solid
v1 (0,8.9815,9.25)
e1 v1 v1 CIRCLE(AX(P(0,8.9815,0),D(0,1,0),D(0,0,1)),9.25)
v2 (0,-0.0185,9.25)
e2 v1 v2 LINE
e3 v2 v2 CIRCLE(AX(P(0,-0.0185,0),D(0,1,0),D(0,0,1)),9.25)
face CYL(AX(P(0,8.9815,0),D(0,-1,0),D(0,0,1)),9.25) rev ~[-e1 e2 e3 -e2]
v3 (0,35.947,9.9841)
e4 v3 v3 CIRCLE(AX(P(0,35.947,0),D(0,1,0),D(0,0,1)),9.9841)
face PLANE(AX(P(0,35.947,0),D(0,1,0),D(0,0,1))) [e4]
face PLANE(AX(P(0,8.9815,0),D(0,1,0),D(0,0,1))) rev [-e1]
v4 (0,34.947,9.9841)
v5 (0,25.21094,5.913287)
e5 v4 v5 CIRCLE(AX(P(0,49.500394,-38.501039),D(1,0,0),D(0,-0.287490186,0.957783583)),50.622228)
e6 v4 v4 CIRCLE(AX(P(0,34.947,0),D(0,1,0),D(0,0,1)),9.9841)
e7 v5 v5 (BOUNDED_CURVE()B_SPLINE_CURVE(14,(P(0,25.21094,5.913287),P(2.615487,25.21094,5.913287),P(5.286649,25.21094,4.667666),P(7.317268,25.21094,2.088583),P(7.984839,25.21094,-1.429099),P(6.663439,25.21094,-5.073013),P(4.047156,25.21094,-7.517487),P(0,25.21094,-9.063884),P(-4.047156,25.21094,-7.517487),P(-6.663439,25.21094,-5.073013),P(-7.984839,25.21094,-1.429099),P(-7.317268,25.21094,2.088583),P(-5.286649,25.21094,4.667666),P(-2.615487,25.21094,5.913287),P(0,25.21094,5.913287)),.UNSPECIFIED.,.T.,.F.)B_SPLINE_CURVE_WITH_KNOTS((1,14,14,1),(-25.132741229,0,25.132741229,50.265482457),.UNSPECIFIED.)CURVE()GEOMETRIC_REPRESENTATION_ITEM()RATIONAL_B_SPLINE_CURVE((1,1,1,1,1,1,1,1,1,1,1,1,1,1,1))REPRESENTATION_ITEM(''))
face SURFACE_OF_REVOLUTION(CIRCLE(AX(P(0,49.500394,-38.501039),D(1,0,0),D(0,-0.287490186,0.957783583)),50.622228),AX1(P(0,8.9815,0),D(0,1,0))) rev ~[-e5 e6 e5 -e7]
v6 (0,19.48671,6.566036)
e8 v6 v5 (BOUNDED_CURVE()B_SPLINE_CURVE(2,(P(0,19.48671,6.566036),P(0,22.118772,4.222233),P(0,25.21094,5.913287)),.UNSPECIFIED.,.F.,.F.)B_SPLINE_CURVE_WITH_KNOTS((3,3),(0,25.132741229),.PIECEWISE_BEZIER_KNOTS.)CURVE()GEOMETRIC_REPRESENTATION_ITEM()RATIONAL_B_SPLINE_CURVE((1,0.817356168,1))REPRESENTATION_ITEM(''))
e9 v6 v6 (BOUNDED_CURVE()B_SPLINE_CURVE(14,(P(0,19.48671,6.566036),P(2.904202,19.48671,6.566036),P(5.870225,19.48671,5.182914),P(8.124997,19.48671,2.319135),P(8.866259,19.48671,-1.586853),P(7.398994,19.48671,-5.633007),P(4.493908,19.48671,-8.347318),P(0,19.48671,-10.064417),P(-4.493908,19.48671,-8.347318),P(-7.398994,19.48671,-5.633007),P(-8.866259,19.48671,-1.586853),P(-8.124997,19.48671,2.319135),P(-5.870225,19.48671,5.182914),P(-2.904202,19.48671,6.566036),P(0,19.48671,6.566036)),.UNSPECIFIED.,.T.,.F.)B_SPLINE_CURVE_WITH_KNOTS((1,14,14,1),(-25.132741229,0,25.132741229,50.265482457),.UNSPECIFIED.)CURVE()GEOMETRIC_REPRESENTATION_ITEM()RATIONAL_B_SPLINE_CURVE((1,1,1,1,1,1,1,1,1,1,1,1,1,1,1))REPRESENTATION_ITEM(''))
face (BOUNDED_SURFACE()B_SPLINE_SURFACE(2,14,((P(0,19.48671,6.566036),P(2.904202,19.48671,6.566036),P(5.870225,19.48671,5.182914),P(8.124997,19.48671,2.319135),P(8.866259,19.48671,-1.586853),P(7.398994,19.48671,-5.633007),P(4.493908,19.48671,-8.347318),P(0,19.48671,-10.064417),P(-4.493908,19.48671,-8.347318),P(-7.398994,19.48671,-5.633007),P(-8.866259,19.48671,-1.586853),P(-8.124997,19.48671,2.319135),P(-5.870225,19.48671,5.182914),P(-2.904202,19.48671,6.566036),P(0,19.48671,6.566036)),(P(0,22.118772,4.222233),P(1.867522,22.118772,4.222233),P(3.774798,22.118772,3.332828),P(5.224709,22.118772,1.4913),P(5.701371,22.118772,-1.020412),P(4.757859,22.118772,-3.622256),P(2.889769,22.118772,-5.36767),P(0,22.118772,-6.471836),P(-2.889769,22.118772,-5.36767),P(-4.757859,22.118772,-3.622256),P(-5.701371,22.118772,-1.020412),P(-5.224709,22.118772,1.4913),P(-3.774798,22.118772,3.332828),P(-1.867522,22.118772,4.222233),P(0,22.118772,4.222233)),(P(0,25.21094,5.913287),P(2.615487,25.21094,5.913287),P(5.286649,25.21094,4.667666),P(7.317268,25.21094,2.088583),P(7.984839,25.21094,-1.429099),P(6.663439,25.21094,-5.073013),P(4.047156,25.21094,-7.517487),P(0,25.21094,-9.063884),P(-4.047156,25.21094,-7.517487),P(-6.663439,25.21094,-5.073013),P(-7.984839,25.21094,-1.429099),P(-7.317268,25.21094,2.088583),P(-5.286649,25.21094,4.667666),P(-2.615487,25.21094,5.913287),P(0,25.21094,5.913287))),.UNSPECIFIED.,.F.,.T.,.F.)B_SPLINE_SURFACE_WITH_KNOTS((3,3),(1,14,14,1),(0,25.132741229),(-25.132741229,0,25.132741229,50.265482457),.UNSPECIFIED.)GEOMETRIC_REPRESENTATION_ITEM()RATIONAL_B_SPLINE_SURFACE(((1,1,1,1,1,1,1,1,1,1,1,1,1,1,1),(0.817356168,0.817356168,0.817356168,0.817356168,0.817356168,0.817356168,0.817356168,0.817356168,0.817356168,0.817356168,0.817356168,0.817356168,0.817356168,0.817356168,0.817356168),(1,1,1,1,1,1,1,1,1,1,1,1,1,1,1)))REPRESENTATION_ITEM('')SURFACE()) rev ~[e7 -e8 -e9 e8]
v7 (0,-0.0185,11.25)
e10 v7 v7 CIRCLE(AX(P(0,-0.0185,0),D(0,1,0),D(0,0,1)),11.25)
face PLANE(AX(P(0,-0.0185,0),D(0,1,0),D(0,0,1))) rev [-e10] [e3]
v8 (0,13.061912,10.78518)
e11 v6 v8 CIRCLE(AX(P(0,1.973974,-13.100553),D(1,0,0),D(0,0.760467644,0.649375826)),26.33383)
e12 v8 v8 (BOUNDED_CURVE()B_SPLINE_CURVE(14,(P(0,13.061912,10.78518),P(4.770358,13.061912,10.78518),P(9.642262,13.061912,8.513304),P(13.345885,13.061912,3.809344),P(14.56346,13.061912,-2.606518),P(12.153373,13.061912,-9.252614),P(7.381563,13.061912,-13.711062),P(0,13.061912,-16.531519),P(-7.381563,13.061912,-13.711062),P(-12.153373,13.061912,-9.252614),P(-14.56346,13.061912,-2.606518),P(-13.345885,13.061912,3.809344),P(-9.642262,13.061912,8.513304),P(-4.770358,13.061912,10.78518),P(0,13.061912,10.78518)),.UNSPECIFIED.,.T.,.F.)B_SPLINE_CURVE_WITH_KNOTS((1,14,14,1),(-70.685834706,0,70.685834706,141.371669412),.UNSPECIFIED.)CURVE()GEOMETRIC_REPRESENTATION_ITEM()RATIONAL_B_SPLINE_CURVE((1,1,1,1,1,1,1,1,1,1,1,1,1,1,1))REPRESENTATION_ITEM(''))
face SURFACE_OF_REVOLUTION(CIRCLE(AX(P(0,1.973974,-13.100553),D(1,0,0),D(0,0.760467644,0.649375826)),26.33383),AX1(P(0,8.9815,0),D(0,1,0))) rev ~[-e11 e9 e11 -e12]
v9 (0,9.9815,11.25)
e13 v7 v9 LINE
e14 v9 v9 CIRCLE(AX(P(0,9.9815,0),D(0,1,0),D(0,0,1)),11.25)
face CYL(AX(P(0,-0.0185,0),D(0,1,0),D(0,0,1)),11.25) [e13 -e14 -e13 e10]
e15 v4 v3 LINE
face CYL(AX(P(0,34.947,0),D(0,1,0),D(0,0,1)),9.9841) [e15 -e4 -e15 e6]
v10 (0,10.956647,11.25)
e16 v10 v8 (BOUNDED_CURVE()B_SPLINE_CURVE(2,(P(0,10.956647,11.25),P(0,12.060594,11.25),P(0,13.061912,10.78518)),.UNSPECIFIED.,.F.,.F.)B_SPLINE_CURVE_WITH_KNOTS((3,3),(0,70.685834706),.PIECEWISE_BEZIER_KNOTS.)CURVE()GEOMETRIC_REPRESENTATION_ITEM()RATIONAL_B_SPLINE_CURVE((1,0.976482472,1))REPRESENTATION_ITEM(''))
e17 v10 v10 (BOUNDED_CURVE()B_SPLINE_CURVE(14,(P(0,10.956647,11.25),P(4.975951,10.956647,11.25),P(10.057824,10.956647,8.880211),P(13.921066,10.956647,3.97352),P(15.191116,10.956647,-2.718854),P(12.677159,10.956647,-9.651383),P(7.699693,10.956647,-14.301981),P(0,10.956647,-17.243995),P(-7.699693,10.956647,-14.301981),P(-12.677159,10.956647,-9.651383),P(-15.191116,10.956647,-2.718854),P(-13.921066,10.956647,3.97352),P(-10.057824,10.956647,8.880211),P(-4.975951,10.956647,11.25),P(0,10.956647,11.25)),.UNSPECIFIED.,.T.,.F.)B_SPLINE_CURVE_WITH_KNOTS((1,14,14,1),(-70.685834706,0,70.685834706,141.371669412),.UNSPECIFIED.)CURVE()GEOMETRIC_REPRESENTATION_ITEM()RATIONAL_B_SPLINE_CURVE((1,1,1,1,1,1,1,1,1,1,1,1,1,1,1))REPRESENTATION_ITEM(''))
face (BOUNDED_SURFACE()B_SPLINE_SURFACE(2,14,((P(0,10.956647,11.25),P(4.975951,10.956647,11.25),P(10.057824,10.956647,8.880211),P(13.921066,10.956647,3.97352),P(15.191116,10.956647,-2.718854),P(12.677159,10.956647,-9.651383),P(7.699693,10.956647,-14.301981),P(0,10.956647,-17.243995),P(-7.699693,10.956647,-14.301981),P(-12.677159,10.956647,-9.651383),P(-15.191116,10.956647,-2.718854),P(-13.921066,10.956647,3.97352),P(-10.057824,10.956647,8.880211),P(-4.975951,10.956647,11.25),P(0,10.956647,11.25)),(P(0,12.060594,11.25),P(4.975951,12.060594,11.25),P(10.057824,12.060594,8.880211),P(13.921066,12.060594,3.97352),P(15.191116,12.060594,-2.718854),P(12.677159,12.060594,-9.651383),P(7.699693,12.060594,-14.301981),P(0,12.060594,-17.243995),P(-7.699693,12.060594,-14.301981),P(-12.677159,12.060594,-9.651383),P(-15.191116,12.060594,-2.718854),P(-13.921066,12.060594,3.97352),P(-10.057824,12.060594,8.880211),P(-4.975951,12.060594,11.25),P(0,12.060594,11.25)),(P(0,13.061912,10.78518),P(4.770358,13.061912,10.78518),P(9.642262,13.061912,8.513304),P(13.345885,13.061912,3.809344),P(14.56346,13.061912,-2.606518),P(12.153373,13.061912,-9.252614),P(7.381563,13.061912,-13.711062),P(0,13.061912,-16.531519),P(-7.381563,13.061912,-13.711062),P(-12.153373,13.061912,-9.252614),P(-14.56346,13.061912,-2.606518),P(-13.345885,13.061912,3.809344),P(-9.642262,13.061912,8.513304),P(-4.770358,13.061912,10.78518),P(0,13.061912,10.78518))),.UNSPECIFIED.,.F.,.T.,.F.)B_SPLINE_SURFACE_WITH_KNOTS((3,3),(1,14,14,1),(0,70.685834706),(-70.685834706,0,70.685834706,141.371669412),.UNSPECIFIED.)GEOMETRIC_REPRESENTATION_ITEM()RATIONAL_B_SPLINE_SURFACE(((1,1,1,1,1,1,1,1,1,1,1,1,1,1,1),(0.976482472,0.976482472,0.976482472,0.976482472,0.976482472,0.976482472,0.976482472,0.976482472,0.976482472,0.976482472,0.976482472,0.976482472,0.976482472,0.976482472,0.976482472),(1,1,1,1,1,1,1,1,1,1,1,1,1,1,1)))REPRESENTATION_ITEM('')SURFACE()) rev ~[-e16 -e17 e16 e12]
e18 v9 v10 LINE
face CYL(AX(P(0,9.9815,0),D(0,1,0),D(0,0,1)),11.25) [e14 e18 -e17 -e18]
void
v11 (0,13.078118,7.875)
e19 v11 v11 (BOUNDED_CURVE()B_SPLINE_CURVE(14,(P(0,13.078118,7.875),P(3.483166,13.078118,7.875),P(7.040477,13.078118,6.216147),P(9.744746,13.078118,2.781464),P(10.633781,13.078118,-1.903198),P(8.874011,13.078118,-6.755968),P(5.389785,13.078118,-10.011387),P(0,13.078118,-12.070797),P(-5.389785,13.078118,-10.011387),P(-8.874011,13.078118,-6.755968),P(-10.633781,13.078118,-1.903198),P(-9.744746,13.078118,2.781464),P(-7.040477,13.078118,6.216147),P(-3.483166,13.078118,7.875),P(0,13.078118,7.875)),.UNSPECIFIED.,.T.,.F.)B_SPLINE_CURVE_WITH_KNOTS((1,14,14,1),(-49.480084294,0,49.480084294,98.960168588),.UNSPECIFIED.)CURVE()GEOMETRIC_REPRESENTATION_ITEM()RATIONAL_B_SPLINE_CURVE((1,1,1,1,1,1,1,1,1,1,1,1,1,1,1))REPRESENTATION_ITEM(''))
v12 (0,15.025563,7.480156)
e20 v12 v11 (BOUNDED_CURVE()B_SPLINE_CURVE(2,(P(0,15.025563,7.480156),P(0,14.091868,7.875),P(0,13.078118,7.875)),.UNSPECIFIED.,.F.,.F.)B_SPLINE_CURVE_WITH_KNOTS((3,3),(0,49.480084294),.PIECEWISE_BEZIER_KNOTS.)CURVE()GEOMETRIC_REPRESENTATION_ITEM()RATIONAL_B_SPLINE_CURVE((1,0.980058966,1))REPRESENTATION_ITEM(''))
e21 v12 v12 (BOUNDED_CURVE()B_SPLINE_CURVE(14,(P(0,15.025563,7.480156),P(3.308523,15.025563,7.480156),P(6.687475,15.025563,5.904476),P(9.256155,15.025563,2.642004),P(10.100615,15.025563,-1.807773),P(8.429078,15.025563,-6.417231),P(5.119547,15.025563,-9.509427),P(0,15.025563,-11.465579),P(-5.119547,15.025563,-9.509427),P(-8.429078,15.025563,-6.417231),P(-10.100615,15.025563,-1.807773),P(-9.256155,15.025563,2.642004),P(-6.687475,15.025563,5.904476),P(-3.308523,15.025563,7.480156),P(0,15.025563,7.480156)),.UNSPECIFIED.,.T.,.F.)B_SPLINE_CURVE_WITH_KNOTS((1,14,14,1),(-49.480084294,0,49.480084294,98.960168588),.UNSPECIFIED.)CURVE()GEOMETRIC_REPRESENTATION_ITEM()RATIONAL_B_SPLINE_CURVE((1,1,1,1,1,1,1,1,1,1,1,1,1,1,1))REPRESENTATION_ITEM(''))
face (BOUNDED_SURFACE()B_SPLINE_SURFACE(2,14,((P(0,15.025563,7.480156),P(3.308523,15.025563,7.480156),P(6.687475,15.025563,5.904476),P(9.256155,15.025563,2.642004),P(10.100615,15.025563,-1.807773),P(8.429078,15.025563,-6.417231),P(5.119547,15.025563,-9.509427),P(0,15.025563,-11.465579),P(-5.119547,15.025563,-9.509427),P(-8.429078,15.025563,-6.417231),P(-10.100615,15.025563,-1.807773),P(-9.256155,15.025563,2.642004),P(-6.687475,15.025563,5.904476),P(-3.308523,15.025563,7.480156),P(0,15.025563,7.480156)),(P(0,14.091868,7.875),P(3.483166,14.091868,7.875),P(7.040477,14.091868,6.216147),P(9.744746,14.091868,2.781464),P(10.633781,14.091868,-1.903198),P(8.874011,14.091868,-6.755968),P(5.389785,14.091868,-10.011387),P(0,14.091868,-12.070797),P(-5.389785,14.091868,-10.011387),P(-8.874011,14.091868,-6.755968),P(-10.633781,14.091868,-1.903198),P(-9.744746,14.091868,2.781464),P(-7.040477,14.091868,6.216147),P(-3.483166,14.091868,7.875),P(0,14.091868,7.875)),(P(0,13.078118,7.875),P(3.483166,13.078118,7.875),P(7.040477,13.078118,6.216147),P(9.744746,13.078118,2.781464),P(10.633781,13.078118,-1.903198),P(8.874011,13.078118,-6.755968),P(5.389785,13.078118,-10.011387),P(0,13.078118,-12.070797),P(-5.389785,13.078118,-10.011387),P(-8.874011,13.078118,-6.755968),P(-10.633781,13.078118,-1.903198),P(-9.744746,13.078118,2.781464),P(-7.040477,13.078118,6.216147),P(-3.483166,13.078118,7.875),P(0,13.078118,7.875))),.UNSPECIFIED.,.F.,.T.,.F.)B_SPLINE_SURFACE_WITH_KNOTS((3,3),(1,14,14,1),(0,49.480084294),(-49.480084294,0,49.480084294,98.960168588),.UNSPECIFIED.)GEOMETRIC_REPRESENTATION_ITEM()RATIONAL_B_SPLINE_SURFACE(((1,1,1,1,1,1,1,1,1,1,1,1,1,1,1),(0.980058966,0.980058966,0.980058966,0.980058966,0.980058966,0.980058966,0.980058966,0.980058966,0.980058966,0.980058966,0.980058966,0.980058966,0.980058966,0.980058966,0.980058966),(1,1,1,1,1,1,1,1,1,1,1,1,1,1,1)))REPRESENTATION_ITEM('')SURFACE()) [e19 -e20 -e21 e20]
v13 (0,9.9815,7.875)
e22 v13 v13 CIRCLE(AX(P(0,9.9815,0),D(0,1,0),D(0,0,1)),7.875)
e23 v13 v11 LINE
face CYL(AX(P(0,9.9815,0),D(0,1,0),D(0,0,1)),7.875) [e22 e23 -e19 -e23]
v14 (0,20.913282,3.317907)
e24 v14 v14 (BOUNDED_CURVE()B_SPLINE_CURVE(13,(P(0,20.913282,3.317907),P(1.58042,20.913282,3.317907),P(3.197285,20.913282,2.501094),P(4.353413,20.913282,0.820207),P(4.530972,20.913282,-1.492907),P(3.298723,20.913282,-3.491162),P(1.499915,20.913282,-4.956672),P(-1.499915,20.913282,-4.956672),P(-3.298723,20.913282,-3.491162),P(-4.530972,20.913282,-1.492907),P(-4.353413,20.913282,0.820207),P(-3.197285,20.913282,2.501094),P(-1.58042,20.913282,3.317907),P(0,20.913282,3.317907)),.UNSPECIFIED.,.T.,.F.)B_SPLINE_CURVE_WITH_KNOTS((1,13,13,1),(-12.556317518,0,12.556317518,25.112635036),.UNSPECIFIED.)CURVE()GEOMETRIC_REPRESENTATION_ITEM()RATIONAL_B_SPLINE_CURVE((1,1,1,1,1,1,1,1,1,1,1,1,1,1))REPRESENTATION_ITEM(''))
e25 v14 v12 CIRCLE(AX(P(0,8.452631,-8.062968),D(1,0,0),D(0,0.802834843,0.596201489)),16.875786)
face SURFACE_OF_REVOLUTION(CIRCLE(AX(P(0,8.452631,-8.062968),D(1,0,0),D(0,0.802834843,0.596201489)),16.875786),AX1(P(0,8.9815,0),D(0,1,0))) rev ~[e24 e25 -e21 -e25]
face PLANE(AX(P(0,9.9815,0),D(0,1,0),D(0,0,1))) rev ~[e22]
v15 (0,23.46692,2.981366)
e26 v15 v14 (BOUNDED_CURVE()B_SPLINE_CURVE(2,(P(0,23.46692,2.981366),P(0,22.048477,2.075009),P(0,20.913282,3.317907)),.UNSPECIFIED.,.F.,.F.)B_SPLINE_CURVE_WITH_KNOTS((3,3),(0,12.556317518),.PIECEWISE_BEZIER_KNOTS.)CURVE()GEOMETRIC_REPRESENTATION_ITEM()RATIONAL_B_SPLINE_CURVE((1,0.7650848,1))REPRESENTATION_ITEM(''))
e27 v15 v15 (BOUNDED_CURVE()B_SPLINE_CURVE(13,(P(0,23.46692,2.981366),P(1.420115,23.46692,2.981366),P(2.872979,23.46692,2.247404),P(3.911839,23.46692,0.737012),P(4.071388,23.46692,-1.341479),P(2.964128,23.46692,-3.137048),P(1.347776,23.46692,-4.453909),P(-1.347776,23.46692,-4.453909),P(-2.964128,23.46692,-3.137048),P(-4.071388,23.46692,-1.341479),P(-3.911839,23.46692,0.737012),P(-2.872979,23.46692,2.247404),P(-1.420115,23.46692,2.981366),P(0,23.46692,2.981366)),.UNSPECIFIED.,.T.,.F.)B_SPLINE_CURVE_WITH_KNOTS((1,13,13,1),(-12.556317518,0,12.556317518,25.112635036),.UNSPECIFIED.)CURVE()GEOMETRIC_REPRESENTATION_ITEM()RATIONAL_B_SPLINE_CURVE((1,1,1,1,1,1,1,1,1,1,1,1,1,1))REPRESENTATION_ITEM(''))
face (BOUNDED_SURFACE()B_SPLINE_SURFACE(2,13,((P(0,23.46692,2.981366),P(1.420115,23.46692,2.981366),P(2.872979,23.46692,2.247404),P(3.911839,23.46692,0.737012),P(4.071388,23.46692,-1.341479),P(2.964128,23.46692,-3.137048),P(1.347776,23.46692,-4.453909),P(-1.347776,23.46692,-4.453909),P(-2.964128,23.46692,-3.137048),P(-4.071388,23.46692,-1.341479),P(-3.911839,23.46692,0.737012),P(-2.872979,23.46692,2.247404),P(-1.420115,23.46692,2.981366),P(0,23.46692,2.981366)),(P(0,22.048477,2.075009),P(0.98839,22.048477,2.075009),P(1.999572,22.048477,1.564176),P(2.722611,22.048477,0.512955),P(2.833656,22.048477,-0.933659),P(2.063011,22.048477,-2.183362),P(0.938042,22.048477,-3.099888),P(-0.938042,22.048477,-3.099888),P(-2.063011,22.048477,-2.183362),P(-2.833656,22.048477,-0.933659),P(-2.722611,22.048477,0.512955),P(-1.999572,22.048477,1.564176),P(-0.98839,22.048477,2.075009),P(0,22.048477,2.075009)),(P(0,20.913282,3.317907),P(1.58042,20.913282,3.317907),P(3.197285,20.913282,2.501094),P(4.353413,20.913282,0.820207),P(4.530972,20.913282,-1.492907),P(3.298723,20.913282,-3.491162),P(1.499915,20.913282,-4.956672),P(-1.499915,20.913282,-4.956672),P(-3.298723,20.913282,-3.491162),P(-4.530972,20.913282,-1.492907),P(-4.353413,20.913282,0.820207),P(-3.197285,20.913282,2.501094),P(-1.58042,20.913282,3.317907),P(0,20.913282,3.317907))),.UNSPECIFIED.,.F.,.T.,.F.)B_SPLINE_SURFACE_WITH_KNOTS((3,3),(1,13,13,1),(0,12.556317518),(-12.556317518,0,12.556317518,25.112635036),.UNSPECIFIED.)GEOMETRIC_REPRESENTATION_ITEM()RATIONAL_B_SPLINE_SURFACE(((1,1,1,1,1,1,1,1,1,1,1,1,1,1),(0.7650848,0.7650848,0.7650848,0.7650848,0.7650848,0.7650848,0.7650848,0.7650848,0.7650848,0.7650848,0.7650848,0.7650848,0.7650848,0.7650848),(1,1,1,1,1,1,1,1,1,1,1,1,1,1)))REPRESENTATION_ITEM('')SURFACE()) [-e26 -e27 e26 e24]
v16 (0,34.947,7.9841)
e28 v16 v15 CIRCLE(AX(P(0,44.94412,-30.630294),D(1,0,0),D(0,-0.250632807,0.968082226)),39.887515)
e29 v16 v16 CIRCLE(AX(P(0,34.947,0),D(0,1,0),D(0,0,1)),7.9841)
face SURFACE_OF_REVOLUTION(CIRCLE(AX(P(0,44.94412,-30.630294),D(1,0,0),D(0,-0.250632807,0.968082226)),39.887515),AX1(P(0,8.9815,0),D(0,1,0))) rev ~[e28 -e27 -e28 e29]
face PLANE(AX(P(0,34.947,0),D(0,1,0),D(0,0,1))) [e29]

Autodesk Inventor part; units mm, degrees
ref_plane "YZ Plane" through (0, 0, 0) normal (1, 0, 0) x (0, 1, 0)
ref_plane "XZ Plane" through (0, 0, 0) normal (0, 1, 0) x (-1, 0, 0)
ref_plane "XY Plane" through (0, 0, 0) normal (0, 0, 1) x (1, 0, 0)
sketch "Sketch1" plane through (0, 0, 0) normal (1, 0, 0) x (0, 1, 0)
  line L0 (9.25, 0.0185) -> (11.25, 0.0185)
  line L1 (11.25, 0.0185) -> (11.25, -9.9815)
  line L2 (11.25, -9.9815) -> (11.25, -12)
  arc A0 (1.9984, -22.0011) -> (7.875, -14) centre (-8.063, -8.4526) ccw
  arc A1 (7.9841, -34.947) -> (1.9984, -22.0011) centre (-30.628, -44.9433) ccw
  arc A2 (4, -22) -> (11.25, -12) centre (-13.1002, -1.9743) ccw
  arc A3 (9.9841, -34.947) -> (4, -22) centre (-38.5, -49.5) ccw
  line L3 (7.875, -9.9815) -> (7.875, -14)
  line L4 (0, 0) -> (0, -36)
  line L5 (7.9841, -34.947) -> (0, -34.947)
  line L6 (0, -34.947) -> (0, -35.947)
  line L7 (9.9841, -34.947) -> (9.9841, -35.947)
  line L8 (9.9841, -35.947) -> (0, -35.947)
  line L9 (7.875, -9.9815) -> (0, -9.9815)
  line L10 (0, -9.9815) -> (0, -8.9815)
  line L11 (0, -8.9815) -> (9.25, -8.9815)
  line L12 (9.25, -8.9815) -> (9.25, 0.0185)
  dimension "d26" = 9.25
  dimension "d28" = 2
  dimension "d37" = 34.9656
  dimension "d57" = 36
  dimension "d59" = 1
  dimension "d60" = 1
  dimension "d61" = 90
revolve "Revolution1" add sketch "Sketch1" angle 360 about axis through (0, 0, 0) along (0, 0, -1) contours L0 L1 L2 A2 A3 L7 L8 L4 L5 A1 A0 L3 L9 L11 L12
move or copy body "Move Body1" bodies to move or copy 1 copy no rotation origin (0, 0, 0) rotation axis (1, 0, 0) rotation angle 90
fillet "Fillet6" radius 2 1 edges at (0, 22.0011, -1.9984)
fillet "Fillet7" radius 5 1 edges at (0, 14, -7.875)
fillet "Fillet8" radius 5 1 edges at (0, 12, -11.25)
fillet "Fillet9" radius 5 1 edges at (0, 22, -4)
properties part number "nozzle-cfd" material "ABS Plastic"
